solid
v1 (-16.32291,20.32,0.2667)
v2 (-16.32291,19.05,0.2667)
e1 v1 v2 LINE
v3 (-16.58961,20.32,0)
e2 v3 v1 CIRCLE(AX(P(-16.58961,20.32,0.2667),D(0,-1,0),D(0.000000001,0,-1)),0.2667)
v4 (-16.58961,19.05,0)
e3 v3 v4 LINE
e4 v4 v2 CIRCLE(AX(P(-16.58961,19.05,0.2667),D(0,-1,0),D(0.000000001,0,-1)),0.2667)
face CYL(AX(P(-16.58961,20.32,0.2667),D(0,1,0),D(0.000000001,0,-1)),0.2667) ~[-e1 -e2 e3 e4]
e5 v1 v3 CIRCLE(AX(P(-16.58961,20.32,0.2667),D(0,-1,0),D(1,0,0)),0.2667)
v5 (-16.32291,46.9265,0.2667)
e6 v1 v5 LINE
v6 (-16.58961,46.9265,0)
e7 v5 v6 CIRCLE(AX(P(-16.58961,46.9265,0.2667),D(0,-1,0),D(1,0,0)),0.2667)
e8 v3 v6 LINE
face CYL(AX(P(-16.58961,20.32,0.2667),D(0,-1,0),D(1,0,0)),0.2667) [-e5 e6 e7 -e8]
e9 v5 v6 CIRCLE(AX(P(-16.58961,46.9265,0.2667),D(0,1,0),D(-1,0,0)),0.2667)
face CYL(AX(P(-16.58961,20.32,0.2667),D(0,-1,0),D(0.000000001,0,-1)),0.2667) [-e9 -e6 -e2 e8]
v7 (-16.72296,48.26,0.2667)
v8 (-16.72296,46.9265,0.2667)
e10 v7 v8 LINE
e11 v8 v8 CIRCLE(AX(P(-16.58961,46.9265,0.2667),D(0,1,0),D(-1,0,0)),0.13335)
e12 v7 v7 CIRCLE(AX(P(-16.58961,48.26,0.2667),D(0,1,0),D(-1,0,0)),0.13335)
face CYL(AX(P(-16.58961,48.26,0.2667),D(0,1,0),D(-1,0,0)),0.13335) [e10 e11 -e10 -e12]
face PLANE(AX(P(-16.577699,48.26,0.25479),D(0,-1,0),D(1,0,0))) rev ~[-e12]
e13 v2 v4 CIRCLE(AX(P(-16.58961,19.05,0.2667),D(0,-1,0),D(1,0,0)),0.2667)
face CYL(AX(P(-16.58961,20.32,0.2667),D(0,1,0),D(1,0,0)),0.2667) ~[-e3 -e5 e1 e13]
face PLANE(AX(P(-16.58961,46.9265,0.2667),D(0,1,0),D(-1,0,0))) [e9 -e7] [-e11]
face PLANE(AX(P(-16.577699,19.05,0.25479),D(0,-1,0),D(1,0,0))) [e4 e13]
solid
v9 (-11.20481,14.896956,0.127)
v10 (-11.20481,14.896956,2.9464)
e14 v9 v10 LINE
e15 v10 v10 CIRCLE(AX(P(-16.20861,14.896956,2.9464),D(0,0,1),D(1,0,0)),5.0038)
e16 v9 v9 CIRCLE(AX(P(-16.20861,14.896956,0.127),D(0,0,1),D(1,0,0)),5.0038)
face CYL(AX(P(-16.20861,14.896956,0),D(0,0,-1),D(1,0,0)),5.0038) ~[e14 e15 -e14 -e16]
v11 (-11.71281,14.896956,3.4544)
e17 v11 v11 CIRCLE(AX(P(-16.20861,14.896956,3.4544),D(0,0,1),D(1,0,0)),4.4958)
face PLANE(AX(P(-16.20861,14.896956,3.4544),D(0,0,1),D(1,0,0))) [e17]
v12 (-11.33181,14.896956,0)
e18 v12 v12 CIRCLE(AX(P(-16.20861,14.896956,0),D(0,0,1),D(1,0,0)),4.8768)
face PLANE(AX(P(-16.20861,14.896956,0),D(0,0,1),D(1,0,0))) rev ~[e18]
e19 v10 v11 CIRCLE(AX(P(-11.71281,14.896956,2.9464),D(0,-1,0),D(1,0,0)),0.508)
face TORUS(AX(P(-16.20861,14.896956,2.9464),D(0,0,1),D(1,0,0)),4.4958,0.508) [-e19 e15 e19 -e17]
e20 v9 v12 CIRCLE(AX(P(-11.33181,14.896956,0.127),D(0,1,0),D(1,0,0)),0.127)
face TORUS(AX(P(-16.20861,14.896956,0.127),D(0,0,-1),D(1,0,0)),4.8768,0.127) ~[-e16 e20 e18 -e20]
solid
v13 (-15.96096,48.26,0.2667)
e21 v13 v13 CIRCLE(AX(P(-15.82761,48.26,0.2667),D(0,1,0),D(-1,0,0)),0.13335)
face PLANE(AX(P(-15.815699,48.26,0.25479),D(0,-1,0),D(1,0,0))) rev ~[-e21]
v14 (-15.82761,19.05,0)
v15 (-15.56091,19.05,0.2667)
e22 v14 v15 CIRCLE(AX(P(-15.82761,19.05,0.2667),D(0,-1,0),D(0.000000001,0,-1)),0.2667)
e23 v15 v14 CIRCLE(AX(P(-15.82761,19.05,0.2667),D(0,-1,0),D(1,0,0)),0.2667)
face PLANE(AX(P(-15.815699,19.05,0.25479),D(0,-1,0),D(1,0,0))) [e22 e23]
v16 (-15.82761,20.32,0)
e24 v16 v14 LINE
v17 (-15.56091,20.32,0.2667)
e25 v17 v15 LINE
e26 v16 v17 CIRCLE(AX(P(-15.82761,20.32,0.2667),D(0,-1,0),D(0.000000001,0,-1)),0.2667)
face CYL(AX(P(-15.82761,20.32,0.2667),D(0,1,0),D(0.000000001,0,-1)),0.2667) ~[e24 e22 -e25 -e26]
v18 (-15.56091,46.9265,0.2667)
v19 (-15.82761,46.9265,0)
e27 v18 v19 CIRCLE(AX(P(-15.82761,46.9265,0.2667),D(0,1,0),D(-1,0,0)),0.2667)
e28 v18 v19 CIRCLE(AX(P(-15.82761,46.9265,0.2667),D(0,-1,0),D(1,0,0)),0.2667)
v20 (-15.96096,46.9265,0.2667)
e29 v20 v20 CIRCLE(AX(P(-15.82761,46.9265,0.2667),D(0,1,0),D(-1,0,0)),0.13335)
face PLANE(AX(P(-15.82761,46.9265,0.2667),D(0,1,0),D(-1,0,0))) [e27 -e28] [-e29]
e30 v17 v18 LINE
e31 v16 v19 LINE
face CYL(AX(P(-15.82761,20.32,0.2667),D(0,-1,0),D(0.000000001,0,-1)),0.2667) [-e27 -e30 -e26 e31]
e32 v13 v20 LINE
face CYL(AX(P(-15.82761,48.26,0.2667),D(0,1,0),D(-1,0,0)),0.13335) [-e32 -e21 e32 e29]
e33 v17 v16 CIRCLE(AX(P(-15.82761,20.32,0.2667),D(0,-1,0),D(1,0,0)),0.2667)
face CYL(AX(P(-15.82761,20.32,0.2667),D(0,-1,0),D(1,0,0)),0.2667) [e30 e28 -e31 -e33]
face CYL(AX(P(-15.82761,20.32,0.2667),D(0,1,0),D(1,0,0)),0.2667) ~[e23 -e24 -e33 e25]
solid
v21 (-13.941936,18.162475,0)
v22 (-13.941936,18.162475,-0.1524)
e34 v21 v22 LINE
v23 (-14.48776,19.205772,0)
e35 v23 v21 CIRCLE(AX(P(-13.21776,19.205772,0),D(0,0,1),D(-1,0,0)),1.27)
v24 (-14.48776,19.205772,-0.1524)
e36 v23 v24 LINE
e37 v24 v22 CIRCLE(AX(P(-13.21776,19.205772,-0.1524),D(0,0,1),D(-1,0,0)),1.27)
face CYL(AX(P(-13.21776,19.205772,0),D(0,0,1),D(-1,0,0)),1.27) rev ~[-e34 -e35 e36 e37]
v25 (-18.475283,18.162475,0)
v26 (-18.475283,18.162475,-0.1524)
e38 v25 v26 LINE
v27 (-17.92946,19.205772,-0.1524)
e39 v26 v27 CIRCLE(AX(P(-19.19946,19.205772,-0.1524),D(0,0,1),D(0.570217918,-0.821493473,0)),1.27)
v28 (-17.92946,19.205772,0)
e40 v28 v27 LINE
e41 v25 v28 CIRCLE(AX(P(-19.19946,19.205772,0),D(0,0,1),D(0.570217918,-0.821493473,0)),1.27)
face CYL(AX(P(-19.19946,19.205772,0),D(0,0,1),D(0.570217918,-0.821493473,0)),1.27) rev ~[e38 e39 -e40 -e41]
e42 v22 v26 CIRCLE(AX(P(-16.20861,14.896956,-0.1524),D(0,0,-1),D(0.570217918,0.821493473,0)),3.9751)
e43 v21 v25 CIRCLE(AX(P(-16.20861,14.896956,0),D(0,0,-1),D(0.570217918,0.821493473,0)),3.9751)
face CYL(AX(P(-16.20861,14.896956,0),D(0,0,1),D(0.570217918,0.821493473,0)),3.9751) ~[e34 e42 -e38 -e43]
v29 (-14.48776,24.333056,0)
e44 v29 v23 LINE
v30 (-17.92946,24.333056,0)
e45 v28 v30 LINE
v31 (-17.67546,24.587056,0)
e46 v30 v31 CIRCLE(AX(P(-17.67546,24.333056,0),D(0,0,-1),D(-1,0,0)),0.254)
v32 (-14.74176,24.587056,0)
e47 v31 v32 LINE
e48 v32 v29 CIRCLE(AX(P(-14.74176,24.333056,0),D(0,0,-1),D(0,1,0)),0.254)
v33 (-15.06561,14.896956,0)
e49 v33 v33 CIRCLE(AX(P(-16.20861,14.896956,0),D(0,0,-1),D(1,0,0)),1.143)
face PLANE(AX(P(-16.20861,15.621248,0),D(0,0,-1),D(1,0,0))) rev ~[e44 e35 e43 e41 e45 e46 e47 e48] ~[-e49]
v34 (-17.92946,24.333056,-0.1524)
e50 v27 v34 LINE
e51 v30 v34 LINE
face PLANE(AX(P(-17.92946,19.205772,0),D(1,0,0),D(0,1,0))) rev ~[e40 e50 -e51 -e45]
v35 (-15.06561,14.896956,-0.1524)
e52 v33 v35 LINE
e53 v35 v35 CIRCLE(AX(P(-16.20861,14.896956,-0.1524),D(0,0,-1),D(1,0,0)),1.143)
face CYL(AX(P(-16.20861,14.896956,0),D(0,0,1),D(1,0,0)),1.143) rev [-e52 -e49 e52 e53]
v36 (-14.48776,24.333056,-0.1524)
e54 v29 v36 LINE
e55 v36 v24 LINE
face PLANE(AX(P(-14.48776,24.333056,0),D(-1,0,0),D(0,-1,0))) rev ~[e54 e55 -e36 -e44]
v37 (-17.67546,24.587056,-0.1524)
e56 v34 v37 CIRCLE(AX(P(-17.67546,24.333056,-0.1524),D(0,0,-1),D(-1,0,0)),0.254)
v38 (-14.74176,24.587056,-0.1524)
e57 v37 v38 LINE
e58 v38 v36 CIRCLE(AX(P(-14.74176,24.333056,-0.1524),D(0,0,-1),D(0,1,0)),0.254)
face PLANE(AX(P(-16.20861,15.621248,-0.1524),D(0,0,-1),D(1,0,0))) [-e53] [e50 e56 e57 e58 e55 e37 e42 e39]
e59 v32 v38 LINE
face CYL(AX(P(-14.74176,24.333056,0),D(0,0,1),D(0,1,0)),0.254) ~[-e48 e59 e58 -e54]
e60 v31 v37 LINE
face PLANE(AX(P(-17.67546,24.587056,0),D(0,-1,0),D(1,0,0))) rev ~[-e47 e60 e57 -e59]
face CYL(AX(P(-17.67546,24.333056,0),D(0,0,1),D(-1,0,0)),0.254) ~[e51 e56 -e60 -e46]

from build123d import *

# Parameters (mm, degrees)
F0_R      = 5.0038
F1_DEPTH  = 3.4544
F2_R      = 1.143
F3_DEPTH  = 0.1524
F6_DEPTH  = 1.27
F7_DEPTH  = 1.27
F8_DEPTH  = 27.94
F9_DEPTH  = 27.94
F10_R     = 0.2667
F10_R_2   = 0.13335
F11_DEPTH = 1.3335
F12_DEPTH = 1.3335
F13_R     = 0.508
F14_R     = 0.127


with BuildPart() as f1:
    # F0 (on Top) → F1 (new body)
    with BuildSketch(Plane.XY):
        with Locations((-16.2086095661, 14.8969562724)):
            Circle(F0_R)
    extrude(amount=F1_DEPTH)

    # F13
    f13_edges = [f1.edges().sort_by_distance(p)[0] for p in [
        (-21.21241, 14.896956, 3.4544),
    ]]
    fillet(f13_edges, radius=F13_R)

    # F14
    f14_edges = [f1.edges().sort_by_distance(p)[0] for p in [
        (-21.21241, 14.896956, 0),
    ]]
    fillet(f14_edges, radius=F14_R)


with BuildPart() as f3:
    # F2 (on face) → F3 (new body)
    with BuildSketch(Plane(origin=(0, 0, 0), x_dir=(1, 0, 0), z_dir=(0, 0, -1))):
        with BuildLine():
            Line((-17.9294595661, -19.2057716882), (-17.9294595661, -19.5955400716))
            ThreePointArc((-17.9294595661, -19.5955400716), (-16.2086095661, -19.9007562724), (-14.4877595661, -19.5955400716))
            Line((-14.4877595661, -19.5955400716), (-14.4877595661, -19.2057716882))
            ThreePointArc((-14.4877595661, -19.2057716882), (-14.3430605213, -18.6170461492), (-13.9419363215, -18.1624749774))
            ThreePointArc((-13.9419363215, -18.1624749774), (-16.2086095661, -10.9218562724), (-18.4752828106, -18.1624749774))
            ThreePointArc((-18.4752828106, -18.1624749774), (-18.0741586109, -18.6170461492), (-17.9294595661, -19.2057716882))
        make_face()
        with Locations((-16.2086095661, -14.8969562724)):
            Circle(F2_R, mode=Mode.SUBTRACT)
        with BuildLine():
            ThreePointArc((-14.4877595661, -19.5955400716), (-16.2086095661, -19.9007562724), (-17.9294595661, -19.5955400716))
            Line((-17.9294595661, -19.5955400716), (-17.9294595661, -24.3330562724))
            ThreePointArc((-17.9294595661, -24.3330562724), (-17.8550646885, -24.5126613948), (-17.6754595661, -24.5870562724))
            Line((-17.6754595661, -24.5870562724), (-14.7417595661, -24.5870562724))
            ThreePointArc((-14.7417595661, -24.5870562724), (-14.5621544437, -24.5126613948), (-14.4877595661, -24.3330562724))
            Line((-14.4877595661, -24.3330562724), (-14.4877595661, -19.5955400716))
        make_face()
    extrude(amount=F3_DEPTH)


with BuildPart() as f6:
    # F5 (on offset) → F6 (new body)
    with BuildSketch(Plane.XZ.offset(-20.32)):
        with BuildLine():
            ThreePointArc((-16.5896095661, 0), (-16.4010241876, 0.0781146215), (-16.3229095661, 0.2667))
            ThreePointArc((-16.3229095661, 0.2667), (-16.7781949446, 0.4552853785), (-16.5896095661, 0))
        make_face()
    extrude(amount=F6_DEPTH)

    # F5 (on offset) → F8 (join)
    with BuildSketch(Plane.XZ.offset(-20.32)):
        with BuildLine():
            ThreePointArc((-16.5896095661, 0), (-16.4010241876, 0.0781146215), (-16.3229095661, 0.2667))
            ThreePointArc((-16.3229095661, 0.2667), (-16.7781949446, 0.4552853785), (-16.5896095661, 0))
        make_face()
    extrude(amount=-F8_DEPTH)

    # F10 (on face) → F12 (cut)
    with BuildSketch(Plane(origin=(0, 48.26, 0), x_dir=(-1, 0, 0), z_dir=(0, 1, 0))):
        with Locations((16.5896095661, 0.2667)):
            Circle(F10_R)
        with Locations((16.5896095661, 0.2667)):
            Circle(F10_R_2, mode=Mode.SUBTRACT)
    extrude(amount=-F12_DEPTH, mode=Mode.SUBTRACT)


with BuildPart() as f7:
    # F5 (on offset) → F7 (new body)
    with BuildSketch(Plane.XZ.offset(-20.32)):
        with BuildLine():
            ThreePointArc((-15.5609095661, 0.2667), (-16.0161949446, 0.4552853785), (-15.8276095661, 0))
            ThreePointArc((-15.8276095661, 0), (-15.6390241876, 0.0781146215), (-15.5609095661, 0.2667))
        make_face()
    extrude(amount=F7_DEPTH)

    # F5 (on offset) → F9 (join)
    with BuildSketch(Plane.XZ.offset(-20.32)):
        with BuildLine():
            ThreePointArc((-15.5609095661, 0.2667), (-16.0161949446, 0.4552853785), (-15.8276095661, 0))
            ThreePointArc((-15.8276095661, 0), (-15.6390241876, 0.0781146215), (-15.5609095661, 0.2667))
        make_face()
    extrude(amount=-F9_DEPTH)

    # F10 (on face) → F11 (cut)
    with BuildSketch(Plane(origin=(0, 48.26, 0), x_dir=(-1, 0, 0), z_dir=(0, 1, 0))):
        with Locations((15.8276095661, 0.2667)):
            Circle(F10_R)
        with Locations((15.8276095661, 0.2667)):
            Circle(F10_R_2, mode=Mode.SUBTRACT)
    extrude(amount=-F11_DEPTH, mode=Mode.SUBTRACT)


solid = Compound([f1.part, f3.part, f6.part, f7.part])
